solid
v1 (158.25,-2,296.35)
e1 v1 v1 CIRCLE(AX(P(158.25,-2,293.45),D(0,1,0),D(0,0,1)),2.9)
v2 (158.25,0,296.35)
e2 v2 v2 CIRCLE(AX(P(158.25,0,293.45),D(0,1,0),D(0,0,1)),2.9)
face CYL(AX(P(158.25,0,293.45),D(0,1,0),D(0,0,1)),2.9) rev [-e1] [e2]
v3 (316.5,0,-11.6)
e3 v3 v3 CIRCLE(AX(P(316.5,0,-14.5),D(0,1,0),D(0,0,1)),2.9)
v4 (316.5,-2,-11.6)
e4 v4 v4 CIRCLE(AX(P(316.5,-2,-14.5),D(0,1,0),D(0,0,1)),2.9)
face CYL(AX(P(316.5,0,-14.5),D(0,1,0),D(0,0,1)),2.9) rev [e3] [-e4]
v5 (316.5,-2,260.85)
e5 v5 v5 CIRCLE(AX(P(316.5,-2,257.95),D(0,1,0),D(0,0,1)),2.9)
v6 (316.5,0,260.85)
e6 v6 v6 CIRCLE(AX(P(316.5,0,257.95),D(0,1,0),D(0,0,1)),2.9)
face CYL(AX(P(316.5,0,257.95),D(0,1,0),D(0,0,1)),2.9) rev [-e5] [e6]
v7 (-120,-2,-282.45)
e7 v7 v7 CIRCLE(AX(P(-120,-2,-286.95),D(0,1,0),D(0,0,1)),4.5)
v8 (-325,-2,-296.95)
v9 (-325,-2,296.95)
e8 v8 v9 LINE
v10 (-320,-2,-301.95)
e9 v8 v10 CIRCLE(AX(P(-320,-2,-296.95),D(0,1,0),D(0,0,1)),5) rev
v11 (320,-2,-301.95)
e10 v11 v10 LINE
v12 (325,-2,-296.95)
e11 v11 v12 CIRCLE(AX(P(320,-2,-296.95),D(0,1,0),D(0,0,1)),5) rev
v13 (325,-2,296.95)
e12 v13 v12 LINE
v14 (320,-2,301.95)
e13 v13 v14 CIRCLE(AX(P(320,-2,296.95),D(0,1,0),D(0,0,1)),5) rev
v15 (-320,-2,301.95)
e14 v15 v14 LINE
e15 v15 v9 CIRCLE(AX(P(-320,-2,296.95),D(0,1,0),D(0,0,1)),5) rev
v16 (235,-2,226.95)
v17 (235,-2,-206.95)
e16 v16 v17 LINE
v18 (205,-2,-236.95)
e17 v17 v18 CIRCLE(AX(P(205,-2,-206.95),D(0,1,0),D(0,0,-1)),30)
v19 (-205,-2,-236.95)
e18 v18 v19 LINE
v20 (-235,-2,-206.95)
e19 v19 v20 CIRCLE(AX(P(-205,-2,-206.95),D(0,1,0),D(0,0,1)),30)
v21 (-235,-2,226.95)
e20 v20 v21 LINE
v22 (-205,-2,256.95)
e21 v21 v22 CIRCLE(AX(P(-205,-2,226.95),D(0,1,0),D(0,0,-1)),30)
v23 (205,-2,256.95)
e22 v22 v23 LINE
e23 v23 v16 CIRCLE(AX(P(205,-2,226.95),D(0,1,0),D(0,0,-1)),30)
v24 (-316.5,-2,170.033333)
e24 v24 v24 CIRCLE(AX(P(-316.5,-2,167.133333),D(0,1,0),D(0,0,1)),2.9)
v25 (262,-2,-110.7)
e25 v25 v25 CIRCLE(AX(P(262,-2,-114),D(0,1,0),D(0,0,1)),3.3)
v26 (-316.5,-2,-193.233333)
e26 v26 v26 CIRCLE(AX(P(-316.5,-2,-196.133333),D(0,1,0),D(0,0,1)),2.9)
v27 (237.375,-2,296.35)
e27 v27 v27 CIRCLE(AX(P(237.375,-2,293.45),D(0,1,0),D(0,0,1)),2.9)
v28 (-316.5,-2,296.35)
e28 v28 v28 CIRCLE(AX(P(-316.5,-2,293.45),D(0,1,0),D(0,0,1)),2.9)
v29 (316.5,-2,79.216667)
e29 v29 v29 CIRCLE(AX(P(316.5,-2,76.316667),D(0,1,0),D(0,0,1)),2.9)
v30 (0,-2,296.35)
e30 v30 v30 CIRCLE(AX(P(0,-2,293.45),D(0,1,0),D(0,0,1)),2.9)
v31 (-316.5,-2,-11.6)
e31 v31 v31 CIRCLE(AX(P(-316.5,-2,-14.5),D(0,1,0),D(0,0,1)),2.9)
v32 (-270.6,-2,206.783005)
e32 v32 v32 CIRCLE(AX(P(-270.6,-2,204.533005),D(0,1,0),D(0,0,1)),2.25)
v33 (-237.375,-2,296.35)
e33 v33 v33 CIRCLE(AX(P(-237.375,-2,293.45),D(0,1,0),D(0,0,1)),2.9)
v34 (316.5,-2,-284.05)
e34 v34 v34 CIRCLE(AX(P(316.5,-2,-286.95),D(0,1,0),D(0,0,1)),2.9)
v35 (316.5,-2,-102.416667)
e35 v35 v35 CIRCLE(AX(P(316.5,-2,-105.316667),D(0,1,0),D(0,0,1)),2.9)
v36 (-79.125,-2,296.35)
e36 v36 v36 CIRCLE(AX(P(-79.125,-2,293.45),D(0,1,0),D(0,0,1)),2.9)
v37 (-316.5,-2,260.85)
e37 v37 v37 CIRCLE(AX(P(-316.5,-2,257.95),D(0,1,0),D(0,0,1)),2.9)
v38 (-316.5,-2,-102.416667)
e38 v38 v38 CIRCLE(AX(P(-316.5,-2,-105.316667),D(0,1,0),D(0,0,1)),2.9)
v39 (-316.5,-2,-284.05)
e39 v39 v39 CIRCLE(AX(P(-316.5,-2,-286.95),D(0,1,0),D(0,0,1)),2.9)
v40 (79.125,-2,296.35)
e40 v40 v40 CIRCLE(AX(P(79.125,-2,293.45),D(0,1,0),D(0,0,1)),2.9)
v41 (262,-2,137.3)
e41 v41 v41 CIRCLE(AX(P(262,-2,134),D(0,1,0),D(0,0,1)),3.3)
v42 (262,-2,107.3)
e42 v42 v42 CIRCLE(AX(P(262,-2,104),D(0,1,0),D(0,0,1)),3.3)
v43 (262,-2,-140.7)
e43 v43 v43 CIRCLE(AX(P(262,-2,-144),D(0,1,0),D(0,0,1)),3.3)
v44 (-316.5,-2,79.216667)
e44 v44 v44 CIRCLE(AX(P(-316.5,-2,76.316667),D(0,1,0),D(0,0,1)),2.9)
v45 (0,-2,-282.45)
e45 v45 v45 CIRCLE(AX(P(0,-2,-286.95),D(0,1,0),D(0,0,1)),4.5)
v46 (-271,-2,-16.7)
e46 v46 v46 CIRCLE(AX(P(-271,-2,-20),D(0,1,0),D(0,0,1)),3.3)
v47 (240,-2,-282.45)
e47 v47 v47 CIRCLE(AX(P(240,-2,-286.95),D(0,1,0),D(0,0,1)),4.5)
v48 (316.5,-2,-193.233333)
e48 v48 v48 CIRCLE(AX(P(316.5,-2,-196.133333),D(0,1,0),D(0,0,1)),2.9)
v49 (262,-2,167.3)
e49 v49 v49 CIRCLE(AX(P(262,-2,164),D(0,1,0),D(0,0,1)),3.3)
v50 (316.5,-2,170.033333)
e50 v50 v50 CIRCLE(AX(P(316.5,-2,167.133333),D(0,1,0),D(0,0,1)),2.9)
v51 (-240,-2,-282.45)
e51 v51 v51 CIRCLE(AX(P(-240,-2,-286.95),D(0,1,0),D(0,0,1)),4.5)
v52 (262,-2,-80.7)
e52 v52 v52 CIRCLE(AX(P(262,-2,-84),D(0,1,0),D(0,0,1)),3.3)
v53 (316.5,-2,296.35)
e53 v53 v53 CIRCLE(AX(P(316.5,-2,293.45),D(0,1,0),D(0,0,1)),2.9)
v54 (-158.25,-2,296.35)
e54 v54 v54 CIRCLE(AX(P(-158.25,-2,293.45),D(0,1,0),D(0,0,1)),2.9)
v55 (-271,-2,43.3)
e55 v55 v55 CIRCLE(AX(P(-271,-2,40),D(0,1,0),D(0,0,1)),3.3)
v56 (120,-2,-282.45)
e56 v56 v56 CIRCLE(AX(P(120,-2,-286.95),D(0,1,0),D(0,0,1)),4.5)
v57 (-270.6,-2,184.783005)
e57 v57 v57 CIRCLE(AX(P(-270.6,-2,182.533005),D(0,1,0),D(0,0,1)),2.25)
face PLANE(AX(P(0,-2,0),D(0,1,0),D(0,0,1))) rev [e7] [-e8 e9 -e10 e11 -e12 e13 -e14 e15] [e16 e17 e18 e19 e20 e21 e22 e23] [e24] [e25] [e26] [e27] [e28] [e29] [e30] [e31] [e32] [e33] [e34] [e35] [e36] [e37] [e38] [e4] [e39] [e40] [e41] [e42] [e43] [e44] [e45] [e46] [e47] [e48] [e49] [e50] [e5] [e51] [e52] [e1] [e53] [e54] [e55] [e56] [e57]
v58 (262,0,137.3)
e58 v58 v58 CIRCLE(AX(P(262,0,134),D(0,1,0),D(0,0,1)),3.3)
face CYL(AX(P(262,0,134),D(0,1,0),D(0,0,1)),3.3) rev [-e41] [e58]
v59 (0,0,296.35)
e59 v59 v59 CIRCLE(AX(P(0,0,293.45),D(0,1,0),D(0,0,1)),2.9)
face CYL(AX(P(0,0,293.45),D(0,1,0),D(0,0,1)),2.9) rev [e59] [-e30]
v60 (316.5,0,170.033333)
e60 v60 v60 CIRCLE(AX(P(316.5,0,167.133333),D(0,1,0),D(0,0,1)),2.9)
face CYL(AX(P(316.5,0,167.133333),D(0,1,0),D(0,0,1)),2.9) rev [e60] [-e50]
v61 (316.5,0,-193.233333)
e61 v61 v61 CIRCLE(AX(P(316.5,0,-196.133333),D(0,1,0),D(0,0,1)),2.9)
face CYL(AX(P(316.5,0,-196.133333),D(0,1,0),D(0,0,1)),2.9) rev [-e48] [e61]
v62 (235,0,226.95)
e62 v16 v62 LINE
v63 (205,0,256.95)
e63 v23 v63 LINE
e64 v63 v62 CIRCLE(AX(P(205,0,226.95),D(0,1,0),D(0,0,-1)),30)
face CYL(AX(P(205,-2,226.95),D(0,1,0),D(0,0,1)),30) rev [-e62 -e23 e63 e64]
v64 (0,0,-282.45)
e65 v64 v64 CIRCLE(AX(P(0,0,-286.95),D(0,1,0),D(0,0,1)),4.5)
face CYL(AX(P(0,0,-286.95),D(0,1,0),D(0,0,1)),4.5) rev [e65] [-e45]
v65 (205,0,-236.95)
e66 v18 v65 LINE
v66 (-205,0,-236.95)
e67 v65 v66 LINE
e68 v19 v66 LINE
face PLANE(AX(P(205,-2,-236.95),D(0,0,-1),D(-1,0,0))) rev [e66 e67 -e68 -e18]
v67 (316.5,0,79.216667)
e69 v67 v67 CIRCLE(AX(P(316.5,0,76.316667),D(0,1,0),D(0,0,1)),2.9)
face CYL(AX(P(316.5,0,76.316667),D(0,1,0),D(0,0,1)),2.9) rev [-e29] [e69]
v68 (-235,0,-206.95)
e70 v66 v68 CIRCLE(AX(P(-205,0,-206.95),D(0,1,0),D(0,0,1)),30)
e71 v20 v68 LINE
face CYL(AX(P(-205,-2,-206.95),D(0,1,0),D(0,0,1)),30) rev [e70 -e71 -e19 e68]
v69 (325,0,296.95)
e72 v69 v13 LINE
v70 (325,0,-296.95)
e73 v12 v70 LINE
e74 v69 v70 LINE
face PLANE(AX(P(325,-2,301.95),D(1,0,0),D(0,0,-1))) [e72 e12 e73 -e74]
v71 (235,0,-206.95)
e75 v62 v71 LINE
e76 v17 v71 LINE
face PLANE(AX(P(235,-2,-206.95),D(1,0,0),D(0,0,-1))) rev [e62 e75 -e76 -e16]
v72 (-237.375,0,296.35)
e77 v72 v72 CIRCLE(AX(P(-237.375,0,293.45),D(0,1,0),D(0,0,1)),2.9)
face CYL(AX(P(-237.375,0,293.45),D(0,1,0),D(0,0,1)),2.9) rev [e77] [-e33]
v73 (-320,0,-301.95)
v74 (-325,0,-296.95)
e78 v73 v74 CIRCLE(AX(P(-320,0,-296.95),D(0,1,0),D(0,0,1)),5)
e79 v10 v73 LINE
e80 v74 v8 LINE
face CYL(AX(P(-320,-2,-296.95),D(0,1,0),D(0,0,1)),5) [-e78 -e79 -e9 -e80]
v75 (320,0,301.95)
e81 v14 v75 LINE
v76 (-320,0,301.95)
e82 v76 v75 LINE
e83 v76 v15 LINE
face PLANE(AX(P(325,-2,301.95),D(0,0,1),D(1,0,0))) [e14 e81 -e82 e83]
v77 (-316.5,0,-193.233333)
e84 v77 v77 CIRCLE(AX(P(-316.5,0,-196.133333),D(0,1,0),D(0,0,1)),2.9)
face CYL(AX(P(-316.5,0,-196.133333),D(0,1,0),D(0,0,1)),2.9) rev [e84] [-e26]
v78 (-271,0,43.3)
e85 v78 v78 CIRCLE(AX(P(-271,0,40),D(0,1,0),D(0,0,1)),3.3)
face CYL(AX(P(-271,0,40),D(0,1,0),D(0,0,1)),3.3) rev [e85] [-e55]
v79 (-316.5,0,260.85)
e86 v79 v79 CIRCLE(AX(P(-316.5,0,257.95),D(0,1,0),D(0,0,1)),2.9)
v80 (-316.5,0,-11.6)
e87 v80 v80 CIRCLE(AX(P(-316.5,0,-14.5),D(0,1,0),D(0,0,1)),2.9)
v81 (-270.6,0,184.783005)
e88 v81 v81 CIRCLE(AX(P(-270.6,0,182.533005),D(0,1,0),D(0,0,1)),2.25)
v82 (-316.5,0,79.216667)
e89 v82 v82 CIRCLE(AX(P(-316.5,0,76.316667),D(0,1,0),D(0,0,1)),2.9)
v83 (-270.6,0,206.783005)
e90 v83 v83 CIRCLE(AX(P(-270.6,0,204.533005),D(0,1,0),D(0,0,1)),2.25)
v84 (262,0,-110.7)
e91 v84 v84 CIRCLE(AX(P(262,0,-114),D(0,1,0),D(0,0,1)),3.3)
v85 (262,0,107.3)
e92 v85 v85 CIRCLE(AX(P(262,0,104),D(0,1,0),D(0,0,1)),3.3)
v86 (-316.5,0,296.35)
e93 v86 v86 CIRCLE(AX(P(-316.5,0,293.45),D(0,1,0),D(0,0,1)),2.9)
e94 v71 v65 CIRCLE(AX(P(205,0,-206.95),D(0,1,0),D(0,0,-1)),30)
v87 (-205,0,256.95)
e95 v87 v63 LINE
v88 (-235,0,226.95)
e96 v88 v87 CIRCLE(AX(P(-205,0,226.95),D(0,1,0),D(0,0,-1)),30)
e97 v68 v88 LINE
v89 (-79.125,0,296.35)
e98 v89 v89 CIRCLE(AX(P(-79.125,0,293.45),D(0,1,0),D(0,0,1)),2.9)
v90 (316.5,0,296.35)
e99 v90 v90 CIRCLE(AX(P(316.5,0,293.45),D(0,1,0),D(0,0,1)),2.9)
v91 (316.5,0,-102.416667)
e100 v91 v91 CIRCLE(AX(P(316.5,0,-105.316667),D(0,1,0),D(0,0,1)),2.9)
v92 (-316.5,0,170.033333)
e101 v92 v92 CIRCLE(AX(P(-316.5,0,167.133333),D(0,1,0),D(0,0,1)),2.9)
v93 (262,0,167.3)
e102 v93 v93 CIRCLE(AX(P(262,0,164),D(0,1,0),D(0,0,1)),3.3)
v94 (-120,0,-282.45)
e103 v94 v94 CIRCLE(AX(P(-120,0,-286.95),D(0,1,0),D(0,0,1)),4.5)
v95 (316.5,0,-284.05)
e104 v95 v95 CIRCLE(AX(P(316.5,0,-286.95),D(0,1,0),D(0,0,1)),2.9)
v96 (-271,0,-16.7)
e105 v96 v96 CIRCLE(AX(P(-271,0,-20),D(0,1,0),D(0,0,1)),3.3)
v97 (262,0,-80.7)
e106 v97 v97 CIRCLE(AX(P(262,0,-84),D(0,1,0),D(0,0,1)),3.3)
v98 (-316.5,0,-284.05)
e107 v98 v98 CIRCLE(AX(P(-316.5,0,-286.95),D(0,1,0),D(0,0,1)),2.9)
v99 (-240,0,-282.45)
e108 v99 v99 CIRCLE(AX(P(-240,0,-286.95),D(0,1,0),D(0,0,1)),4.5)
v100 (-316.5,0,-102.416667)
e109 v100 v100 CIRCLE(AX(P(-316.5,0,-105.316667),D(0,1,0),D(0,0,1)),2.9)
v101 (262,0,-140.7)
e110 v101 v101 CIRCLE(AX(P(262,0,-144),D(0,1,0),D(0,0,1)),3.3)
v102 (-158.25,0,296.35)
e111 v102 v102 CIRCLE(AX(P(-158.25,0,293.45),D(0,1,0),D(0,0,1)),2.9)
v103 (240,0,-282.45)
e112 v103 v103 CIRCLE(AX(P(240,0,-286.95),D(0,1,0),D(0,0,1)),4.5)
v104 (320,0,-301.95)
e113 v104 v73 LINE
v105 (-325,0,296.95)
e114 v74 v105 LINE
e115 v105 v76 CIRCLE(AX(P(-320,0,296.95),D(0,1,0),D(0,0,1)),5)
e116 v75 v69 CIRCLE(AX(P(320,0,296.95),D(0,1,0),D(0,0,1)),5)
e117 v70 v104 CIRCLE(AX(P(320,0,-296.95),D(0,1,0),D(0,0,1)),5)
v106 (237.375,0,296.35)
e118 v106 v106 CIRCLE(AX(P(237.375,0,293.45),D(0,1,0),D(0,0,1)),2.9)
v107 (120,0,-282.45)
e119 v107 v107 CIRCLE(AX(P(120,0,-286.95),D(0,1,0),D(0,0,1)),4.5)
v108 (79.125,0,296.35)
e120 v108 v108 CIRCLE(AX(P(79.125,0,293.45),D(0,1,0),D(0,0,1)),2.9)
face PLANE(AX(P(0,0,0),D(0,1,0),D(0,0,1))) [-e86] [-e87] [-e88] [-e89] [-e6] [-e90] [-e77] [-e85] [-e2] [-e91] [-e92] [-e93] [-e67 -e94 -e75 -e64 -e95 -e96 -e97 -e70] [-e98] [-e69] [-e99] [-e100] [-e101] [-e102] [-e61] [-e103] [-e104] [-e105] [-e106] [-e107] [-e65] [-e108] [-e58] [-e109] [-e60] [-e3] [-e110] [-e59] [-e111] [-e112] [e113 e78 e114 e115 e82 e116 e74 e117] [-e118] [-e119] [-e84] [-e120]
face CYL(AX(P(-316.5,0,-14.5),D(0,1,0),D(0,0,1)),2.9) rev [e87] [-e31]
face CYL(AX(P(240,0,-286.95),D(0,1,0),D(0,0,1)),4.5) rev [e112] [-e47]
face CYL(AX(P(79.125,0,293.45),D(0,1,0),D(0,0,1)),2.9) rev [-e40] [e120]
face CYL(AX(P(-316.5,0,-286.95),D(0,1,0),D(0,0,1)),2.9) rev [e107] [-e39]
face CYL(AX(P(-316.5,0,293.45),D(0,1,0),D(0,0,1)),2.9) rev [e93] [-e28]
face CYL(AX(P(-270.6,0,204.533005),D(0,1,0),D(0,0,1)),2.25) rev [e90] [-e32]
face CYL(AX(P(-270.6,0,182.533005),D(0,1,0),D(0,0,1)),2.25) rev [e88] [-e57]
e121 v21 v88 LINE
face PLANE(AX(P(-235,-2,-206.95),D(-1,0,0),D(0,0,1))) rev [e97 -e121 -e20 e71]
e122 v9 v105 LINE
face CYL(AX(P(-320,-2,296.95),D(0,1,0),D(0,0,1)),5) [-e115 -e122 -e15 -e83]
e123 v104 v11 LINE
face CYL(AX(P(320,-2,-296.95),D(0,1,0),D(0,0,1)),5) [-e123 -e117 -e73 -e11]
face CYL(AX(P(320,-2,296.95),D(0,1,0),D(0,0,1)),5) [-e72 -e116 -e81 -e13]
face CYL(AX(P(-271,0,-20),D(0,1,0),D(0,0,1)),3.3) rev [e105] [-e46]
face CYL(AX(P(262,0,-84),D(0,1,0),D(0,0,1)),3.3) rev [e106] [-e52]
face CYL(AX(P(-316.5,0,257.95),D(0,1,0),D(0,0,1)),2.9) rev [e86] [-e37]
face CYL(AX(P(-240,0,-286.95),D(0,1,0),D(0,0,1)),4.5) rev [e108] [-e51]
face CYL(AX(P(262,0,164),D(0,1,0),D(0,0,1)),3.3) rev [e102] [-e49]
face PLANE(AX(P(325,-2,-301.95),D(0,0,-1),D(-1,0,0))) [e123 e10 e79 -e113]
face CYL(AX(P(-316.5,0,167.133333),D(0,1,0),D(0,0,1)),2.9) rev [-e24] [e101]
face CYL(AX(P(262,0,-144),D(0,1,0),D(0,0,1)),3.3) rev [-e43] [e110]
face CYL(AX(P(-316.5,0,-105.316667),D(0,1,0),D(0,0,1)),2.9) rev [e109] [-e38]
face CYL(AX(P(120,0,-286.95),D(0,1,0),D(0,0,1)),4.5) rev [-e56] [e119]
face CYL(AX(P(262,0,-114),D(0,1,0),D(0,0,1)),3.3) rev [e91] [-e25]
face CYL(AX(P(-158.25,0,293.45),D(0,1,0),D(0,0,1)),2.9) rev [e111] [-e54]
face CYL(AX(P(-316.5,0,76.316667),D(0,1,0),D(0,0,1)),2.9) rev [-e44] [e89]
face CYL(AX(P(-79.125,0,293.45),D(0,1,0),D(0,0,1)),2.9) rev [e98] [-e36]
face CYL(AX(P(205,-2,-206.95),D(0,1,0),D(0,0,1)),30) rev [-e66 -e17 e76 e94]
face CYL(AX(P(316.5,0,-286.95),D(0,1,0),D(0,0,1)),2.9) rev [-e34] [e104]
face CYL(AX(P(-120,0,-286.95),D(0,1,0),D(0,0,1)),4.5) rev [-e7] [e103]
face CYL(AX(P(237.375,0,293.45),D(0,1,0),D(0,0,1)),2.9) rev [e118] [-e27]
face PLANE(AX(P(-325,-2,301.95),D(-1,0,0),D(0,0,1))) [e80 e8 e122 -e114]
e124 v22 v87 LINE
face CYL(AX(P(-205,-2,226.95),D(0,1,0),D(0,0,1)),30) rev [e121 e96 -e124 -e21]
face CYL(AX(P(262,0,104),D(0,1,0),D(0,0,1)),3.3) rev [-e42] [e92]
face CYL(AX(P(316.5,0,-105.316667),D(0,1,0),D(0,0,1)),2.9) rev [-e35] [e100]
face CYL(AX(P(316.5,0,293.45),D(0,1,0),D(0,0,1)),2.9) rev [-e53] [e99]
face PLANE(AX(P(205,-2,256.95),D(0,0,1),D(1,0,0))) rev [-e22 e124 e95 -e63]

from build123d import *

# Parameters (mm, degrees)
SKETCH1_W            = 650
SKETCH1_H            = 603.9
BASE_FLANGE1_DEPTH   = 2
M8_CLEARANCE_HOLE1_D = 9
CUT_EXTRUDE1_DEPTH   = 10
M6_CLEARANCE_HOLE1_D = 6.6
M6_CLEARANCE_HOLE2_D = 6.6
M5_CLEARANCE_HOLE1_D = 5.8
M5_CLEARANCE_HOLE2_D = 5.8
M4_CLEARANCE_HOLE1_D = 4.5
FILLET1_R            = 5


# Sheet-metal steps are written as plain solids
with BuildPart() as part:
    # Sketch1 → Base-Flange1 (new body)
    with BuildSketch(Plane(origin=(0, 0, 0), x_dir=(1, 0, 0), z_dir=(0, 1, 0))):
        Rectangle(SKETCH1_W, SKETCH1_H)
    extrude(amount=-BASE_FLANGE1_DEPTH)

    # M8 Clearance Hole1 (through all)
    with Locations(Plane(origin=(0, 0, 0), x_dir=(1, 0, 0), z_dir=(0, 1, 0))):
        with Locations((240, 286.95), (120, 286.95), (0, 286.95), (-240, 286.95), (-120, 286.95)):
            Hole(M8_CLEARANCE_HOLE1_D / 2)

    # Sketch8 → Cut-Extrude1 (cut)
    with BuildSketch(Plane(origin=(0, 0, 0), x_dir=(1, 0, 0), z_dir=(0, 1, 0))):
        with BuildLine():
            Line((205, 236.95), (-205, 236.95))
            ThreePointArc((-205, 236.95), (-226.213203436, 228.163203436), (-235, 206.95))
            Line((-235, 206.95), (-235, -226.95))
            ThreePointArc((-235, -226.95), (-226.213203436, -248.163203436), (-205, -256.95))
            Line((-205, -256.95), (205, -256.95))
            ThreePointArc((205, -256.95), (226.213203436, -248.163203436), (235, -226.95))
            Line((235, -226.95), (235, 206.95))
            ThreePointArc((235, 206.95), (226.213203436, 228.163203436), (205, 236.95))
        make_face()
    extrude(amount=-CUT_EXTRUDE1_DEPTH, mode=Mode.SUBTRACT)

    # M6 Clearance Hole1 (through all)
    with Locations(Plane(origin=(0, 0, 0), x_dir=(1, 0, 0), z_dir=(0, 1, 0))):
        with Locations((262, -164), (262, -134), (262, -104), (262, 84), (262, 114), (262, 144)):
            Hole(M6_CLEARANCE_HOLE1_D / 2)

    # M6 Clearance Hole2 (through all)
    with Locations(Plane(origin=(0, 0, 0), x_dir=(1, 0, 0), z_dir=(0, 1, 0))):
        with Locations((-271, 20), (-271, -40)):
            Hole(M6_CLEARANCE_HOLE2_D / 2)

    # M5 Clearance Hole1 (through all)
    with Locations(Plane(origin=(0, 0, 0), x_dir=(1, 0, 0), z_dir=(0, 1, 0))):
        with Locations((-316.5, 286.95), (-316.5, 196.133333333), (-316.5, 105.316666667), (-316.5, 14.5), (-316.5, -76.316666667), (-316.5, -167.133333333), (-316.5, -257.95), (-316.5, -293.45)):
            m5_clearance_hole1 = Hole(M5_CLEARANCE_HOLE1_D / 2)

    # Mirror1: M5 Clearance Hole1 across plane
    add(m5_clearance_hole1.mirror(Plane(origin=(0, 0, 0), x_dir=(0, 0, 1), z_dir=(1, 0, 0))), mode=Mode.SUBTRACT)

    # M5 Clearance Hole2 (through all)
    with Locations(Plane(origin=(0, 0, 0), x_dir=(1, 0, 0), z_dir=(0, 1, 0))):
        with Locations((-237.375, -293.45), (-158.25, -293.45), (-79.125, -293.45), (0, -293.45), (79.125, -293.45), (158.25, -293.45), (237.375, -293.45)):
            Hole(M5_CLEARANCE_HOLE2_D / 2)

    # M4 Clearance Hole1 (through all)
    with Locations(Plane(origin=(0, 0, 0), x_dir=(1, 0, 0), z_dir=(0, 1, 0))):
        with Locations((-270.6, -182.533005244), (-270.6, -204.533005244)):
            Hole(M4_CLEARANCE_HOLE1_D / 2)

    # Fillet1
    fillet1_edges = [part.edges().sort_by_distance(p)[0] for p in [
        (-325, -1, -301.95),
        (325, -1, -301.95),
        (325, -1, 301.95),
        (-325, -1, 301.95),
    ]]
    fillet(fillet1_edges, radius=FILLET1_R)


solid = part.part
